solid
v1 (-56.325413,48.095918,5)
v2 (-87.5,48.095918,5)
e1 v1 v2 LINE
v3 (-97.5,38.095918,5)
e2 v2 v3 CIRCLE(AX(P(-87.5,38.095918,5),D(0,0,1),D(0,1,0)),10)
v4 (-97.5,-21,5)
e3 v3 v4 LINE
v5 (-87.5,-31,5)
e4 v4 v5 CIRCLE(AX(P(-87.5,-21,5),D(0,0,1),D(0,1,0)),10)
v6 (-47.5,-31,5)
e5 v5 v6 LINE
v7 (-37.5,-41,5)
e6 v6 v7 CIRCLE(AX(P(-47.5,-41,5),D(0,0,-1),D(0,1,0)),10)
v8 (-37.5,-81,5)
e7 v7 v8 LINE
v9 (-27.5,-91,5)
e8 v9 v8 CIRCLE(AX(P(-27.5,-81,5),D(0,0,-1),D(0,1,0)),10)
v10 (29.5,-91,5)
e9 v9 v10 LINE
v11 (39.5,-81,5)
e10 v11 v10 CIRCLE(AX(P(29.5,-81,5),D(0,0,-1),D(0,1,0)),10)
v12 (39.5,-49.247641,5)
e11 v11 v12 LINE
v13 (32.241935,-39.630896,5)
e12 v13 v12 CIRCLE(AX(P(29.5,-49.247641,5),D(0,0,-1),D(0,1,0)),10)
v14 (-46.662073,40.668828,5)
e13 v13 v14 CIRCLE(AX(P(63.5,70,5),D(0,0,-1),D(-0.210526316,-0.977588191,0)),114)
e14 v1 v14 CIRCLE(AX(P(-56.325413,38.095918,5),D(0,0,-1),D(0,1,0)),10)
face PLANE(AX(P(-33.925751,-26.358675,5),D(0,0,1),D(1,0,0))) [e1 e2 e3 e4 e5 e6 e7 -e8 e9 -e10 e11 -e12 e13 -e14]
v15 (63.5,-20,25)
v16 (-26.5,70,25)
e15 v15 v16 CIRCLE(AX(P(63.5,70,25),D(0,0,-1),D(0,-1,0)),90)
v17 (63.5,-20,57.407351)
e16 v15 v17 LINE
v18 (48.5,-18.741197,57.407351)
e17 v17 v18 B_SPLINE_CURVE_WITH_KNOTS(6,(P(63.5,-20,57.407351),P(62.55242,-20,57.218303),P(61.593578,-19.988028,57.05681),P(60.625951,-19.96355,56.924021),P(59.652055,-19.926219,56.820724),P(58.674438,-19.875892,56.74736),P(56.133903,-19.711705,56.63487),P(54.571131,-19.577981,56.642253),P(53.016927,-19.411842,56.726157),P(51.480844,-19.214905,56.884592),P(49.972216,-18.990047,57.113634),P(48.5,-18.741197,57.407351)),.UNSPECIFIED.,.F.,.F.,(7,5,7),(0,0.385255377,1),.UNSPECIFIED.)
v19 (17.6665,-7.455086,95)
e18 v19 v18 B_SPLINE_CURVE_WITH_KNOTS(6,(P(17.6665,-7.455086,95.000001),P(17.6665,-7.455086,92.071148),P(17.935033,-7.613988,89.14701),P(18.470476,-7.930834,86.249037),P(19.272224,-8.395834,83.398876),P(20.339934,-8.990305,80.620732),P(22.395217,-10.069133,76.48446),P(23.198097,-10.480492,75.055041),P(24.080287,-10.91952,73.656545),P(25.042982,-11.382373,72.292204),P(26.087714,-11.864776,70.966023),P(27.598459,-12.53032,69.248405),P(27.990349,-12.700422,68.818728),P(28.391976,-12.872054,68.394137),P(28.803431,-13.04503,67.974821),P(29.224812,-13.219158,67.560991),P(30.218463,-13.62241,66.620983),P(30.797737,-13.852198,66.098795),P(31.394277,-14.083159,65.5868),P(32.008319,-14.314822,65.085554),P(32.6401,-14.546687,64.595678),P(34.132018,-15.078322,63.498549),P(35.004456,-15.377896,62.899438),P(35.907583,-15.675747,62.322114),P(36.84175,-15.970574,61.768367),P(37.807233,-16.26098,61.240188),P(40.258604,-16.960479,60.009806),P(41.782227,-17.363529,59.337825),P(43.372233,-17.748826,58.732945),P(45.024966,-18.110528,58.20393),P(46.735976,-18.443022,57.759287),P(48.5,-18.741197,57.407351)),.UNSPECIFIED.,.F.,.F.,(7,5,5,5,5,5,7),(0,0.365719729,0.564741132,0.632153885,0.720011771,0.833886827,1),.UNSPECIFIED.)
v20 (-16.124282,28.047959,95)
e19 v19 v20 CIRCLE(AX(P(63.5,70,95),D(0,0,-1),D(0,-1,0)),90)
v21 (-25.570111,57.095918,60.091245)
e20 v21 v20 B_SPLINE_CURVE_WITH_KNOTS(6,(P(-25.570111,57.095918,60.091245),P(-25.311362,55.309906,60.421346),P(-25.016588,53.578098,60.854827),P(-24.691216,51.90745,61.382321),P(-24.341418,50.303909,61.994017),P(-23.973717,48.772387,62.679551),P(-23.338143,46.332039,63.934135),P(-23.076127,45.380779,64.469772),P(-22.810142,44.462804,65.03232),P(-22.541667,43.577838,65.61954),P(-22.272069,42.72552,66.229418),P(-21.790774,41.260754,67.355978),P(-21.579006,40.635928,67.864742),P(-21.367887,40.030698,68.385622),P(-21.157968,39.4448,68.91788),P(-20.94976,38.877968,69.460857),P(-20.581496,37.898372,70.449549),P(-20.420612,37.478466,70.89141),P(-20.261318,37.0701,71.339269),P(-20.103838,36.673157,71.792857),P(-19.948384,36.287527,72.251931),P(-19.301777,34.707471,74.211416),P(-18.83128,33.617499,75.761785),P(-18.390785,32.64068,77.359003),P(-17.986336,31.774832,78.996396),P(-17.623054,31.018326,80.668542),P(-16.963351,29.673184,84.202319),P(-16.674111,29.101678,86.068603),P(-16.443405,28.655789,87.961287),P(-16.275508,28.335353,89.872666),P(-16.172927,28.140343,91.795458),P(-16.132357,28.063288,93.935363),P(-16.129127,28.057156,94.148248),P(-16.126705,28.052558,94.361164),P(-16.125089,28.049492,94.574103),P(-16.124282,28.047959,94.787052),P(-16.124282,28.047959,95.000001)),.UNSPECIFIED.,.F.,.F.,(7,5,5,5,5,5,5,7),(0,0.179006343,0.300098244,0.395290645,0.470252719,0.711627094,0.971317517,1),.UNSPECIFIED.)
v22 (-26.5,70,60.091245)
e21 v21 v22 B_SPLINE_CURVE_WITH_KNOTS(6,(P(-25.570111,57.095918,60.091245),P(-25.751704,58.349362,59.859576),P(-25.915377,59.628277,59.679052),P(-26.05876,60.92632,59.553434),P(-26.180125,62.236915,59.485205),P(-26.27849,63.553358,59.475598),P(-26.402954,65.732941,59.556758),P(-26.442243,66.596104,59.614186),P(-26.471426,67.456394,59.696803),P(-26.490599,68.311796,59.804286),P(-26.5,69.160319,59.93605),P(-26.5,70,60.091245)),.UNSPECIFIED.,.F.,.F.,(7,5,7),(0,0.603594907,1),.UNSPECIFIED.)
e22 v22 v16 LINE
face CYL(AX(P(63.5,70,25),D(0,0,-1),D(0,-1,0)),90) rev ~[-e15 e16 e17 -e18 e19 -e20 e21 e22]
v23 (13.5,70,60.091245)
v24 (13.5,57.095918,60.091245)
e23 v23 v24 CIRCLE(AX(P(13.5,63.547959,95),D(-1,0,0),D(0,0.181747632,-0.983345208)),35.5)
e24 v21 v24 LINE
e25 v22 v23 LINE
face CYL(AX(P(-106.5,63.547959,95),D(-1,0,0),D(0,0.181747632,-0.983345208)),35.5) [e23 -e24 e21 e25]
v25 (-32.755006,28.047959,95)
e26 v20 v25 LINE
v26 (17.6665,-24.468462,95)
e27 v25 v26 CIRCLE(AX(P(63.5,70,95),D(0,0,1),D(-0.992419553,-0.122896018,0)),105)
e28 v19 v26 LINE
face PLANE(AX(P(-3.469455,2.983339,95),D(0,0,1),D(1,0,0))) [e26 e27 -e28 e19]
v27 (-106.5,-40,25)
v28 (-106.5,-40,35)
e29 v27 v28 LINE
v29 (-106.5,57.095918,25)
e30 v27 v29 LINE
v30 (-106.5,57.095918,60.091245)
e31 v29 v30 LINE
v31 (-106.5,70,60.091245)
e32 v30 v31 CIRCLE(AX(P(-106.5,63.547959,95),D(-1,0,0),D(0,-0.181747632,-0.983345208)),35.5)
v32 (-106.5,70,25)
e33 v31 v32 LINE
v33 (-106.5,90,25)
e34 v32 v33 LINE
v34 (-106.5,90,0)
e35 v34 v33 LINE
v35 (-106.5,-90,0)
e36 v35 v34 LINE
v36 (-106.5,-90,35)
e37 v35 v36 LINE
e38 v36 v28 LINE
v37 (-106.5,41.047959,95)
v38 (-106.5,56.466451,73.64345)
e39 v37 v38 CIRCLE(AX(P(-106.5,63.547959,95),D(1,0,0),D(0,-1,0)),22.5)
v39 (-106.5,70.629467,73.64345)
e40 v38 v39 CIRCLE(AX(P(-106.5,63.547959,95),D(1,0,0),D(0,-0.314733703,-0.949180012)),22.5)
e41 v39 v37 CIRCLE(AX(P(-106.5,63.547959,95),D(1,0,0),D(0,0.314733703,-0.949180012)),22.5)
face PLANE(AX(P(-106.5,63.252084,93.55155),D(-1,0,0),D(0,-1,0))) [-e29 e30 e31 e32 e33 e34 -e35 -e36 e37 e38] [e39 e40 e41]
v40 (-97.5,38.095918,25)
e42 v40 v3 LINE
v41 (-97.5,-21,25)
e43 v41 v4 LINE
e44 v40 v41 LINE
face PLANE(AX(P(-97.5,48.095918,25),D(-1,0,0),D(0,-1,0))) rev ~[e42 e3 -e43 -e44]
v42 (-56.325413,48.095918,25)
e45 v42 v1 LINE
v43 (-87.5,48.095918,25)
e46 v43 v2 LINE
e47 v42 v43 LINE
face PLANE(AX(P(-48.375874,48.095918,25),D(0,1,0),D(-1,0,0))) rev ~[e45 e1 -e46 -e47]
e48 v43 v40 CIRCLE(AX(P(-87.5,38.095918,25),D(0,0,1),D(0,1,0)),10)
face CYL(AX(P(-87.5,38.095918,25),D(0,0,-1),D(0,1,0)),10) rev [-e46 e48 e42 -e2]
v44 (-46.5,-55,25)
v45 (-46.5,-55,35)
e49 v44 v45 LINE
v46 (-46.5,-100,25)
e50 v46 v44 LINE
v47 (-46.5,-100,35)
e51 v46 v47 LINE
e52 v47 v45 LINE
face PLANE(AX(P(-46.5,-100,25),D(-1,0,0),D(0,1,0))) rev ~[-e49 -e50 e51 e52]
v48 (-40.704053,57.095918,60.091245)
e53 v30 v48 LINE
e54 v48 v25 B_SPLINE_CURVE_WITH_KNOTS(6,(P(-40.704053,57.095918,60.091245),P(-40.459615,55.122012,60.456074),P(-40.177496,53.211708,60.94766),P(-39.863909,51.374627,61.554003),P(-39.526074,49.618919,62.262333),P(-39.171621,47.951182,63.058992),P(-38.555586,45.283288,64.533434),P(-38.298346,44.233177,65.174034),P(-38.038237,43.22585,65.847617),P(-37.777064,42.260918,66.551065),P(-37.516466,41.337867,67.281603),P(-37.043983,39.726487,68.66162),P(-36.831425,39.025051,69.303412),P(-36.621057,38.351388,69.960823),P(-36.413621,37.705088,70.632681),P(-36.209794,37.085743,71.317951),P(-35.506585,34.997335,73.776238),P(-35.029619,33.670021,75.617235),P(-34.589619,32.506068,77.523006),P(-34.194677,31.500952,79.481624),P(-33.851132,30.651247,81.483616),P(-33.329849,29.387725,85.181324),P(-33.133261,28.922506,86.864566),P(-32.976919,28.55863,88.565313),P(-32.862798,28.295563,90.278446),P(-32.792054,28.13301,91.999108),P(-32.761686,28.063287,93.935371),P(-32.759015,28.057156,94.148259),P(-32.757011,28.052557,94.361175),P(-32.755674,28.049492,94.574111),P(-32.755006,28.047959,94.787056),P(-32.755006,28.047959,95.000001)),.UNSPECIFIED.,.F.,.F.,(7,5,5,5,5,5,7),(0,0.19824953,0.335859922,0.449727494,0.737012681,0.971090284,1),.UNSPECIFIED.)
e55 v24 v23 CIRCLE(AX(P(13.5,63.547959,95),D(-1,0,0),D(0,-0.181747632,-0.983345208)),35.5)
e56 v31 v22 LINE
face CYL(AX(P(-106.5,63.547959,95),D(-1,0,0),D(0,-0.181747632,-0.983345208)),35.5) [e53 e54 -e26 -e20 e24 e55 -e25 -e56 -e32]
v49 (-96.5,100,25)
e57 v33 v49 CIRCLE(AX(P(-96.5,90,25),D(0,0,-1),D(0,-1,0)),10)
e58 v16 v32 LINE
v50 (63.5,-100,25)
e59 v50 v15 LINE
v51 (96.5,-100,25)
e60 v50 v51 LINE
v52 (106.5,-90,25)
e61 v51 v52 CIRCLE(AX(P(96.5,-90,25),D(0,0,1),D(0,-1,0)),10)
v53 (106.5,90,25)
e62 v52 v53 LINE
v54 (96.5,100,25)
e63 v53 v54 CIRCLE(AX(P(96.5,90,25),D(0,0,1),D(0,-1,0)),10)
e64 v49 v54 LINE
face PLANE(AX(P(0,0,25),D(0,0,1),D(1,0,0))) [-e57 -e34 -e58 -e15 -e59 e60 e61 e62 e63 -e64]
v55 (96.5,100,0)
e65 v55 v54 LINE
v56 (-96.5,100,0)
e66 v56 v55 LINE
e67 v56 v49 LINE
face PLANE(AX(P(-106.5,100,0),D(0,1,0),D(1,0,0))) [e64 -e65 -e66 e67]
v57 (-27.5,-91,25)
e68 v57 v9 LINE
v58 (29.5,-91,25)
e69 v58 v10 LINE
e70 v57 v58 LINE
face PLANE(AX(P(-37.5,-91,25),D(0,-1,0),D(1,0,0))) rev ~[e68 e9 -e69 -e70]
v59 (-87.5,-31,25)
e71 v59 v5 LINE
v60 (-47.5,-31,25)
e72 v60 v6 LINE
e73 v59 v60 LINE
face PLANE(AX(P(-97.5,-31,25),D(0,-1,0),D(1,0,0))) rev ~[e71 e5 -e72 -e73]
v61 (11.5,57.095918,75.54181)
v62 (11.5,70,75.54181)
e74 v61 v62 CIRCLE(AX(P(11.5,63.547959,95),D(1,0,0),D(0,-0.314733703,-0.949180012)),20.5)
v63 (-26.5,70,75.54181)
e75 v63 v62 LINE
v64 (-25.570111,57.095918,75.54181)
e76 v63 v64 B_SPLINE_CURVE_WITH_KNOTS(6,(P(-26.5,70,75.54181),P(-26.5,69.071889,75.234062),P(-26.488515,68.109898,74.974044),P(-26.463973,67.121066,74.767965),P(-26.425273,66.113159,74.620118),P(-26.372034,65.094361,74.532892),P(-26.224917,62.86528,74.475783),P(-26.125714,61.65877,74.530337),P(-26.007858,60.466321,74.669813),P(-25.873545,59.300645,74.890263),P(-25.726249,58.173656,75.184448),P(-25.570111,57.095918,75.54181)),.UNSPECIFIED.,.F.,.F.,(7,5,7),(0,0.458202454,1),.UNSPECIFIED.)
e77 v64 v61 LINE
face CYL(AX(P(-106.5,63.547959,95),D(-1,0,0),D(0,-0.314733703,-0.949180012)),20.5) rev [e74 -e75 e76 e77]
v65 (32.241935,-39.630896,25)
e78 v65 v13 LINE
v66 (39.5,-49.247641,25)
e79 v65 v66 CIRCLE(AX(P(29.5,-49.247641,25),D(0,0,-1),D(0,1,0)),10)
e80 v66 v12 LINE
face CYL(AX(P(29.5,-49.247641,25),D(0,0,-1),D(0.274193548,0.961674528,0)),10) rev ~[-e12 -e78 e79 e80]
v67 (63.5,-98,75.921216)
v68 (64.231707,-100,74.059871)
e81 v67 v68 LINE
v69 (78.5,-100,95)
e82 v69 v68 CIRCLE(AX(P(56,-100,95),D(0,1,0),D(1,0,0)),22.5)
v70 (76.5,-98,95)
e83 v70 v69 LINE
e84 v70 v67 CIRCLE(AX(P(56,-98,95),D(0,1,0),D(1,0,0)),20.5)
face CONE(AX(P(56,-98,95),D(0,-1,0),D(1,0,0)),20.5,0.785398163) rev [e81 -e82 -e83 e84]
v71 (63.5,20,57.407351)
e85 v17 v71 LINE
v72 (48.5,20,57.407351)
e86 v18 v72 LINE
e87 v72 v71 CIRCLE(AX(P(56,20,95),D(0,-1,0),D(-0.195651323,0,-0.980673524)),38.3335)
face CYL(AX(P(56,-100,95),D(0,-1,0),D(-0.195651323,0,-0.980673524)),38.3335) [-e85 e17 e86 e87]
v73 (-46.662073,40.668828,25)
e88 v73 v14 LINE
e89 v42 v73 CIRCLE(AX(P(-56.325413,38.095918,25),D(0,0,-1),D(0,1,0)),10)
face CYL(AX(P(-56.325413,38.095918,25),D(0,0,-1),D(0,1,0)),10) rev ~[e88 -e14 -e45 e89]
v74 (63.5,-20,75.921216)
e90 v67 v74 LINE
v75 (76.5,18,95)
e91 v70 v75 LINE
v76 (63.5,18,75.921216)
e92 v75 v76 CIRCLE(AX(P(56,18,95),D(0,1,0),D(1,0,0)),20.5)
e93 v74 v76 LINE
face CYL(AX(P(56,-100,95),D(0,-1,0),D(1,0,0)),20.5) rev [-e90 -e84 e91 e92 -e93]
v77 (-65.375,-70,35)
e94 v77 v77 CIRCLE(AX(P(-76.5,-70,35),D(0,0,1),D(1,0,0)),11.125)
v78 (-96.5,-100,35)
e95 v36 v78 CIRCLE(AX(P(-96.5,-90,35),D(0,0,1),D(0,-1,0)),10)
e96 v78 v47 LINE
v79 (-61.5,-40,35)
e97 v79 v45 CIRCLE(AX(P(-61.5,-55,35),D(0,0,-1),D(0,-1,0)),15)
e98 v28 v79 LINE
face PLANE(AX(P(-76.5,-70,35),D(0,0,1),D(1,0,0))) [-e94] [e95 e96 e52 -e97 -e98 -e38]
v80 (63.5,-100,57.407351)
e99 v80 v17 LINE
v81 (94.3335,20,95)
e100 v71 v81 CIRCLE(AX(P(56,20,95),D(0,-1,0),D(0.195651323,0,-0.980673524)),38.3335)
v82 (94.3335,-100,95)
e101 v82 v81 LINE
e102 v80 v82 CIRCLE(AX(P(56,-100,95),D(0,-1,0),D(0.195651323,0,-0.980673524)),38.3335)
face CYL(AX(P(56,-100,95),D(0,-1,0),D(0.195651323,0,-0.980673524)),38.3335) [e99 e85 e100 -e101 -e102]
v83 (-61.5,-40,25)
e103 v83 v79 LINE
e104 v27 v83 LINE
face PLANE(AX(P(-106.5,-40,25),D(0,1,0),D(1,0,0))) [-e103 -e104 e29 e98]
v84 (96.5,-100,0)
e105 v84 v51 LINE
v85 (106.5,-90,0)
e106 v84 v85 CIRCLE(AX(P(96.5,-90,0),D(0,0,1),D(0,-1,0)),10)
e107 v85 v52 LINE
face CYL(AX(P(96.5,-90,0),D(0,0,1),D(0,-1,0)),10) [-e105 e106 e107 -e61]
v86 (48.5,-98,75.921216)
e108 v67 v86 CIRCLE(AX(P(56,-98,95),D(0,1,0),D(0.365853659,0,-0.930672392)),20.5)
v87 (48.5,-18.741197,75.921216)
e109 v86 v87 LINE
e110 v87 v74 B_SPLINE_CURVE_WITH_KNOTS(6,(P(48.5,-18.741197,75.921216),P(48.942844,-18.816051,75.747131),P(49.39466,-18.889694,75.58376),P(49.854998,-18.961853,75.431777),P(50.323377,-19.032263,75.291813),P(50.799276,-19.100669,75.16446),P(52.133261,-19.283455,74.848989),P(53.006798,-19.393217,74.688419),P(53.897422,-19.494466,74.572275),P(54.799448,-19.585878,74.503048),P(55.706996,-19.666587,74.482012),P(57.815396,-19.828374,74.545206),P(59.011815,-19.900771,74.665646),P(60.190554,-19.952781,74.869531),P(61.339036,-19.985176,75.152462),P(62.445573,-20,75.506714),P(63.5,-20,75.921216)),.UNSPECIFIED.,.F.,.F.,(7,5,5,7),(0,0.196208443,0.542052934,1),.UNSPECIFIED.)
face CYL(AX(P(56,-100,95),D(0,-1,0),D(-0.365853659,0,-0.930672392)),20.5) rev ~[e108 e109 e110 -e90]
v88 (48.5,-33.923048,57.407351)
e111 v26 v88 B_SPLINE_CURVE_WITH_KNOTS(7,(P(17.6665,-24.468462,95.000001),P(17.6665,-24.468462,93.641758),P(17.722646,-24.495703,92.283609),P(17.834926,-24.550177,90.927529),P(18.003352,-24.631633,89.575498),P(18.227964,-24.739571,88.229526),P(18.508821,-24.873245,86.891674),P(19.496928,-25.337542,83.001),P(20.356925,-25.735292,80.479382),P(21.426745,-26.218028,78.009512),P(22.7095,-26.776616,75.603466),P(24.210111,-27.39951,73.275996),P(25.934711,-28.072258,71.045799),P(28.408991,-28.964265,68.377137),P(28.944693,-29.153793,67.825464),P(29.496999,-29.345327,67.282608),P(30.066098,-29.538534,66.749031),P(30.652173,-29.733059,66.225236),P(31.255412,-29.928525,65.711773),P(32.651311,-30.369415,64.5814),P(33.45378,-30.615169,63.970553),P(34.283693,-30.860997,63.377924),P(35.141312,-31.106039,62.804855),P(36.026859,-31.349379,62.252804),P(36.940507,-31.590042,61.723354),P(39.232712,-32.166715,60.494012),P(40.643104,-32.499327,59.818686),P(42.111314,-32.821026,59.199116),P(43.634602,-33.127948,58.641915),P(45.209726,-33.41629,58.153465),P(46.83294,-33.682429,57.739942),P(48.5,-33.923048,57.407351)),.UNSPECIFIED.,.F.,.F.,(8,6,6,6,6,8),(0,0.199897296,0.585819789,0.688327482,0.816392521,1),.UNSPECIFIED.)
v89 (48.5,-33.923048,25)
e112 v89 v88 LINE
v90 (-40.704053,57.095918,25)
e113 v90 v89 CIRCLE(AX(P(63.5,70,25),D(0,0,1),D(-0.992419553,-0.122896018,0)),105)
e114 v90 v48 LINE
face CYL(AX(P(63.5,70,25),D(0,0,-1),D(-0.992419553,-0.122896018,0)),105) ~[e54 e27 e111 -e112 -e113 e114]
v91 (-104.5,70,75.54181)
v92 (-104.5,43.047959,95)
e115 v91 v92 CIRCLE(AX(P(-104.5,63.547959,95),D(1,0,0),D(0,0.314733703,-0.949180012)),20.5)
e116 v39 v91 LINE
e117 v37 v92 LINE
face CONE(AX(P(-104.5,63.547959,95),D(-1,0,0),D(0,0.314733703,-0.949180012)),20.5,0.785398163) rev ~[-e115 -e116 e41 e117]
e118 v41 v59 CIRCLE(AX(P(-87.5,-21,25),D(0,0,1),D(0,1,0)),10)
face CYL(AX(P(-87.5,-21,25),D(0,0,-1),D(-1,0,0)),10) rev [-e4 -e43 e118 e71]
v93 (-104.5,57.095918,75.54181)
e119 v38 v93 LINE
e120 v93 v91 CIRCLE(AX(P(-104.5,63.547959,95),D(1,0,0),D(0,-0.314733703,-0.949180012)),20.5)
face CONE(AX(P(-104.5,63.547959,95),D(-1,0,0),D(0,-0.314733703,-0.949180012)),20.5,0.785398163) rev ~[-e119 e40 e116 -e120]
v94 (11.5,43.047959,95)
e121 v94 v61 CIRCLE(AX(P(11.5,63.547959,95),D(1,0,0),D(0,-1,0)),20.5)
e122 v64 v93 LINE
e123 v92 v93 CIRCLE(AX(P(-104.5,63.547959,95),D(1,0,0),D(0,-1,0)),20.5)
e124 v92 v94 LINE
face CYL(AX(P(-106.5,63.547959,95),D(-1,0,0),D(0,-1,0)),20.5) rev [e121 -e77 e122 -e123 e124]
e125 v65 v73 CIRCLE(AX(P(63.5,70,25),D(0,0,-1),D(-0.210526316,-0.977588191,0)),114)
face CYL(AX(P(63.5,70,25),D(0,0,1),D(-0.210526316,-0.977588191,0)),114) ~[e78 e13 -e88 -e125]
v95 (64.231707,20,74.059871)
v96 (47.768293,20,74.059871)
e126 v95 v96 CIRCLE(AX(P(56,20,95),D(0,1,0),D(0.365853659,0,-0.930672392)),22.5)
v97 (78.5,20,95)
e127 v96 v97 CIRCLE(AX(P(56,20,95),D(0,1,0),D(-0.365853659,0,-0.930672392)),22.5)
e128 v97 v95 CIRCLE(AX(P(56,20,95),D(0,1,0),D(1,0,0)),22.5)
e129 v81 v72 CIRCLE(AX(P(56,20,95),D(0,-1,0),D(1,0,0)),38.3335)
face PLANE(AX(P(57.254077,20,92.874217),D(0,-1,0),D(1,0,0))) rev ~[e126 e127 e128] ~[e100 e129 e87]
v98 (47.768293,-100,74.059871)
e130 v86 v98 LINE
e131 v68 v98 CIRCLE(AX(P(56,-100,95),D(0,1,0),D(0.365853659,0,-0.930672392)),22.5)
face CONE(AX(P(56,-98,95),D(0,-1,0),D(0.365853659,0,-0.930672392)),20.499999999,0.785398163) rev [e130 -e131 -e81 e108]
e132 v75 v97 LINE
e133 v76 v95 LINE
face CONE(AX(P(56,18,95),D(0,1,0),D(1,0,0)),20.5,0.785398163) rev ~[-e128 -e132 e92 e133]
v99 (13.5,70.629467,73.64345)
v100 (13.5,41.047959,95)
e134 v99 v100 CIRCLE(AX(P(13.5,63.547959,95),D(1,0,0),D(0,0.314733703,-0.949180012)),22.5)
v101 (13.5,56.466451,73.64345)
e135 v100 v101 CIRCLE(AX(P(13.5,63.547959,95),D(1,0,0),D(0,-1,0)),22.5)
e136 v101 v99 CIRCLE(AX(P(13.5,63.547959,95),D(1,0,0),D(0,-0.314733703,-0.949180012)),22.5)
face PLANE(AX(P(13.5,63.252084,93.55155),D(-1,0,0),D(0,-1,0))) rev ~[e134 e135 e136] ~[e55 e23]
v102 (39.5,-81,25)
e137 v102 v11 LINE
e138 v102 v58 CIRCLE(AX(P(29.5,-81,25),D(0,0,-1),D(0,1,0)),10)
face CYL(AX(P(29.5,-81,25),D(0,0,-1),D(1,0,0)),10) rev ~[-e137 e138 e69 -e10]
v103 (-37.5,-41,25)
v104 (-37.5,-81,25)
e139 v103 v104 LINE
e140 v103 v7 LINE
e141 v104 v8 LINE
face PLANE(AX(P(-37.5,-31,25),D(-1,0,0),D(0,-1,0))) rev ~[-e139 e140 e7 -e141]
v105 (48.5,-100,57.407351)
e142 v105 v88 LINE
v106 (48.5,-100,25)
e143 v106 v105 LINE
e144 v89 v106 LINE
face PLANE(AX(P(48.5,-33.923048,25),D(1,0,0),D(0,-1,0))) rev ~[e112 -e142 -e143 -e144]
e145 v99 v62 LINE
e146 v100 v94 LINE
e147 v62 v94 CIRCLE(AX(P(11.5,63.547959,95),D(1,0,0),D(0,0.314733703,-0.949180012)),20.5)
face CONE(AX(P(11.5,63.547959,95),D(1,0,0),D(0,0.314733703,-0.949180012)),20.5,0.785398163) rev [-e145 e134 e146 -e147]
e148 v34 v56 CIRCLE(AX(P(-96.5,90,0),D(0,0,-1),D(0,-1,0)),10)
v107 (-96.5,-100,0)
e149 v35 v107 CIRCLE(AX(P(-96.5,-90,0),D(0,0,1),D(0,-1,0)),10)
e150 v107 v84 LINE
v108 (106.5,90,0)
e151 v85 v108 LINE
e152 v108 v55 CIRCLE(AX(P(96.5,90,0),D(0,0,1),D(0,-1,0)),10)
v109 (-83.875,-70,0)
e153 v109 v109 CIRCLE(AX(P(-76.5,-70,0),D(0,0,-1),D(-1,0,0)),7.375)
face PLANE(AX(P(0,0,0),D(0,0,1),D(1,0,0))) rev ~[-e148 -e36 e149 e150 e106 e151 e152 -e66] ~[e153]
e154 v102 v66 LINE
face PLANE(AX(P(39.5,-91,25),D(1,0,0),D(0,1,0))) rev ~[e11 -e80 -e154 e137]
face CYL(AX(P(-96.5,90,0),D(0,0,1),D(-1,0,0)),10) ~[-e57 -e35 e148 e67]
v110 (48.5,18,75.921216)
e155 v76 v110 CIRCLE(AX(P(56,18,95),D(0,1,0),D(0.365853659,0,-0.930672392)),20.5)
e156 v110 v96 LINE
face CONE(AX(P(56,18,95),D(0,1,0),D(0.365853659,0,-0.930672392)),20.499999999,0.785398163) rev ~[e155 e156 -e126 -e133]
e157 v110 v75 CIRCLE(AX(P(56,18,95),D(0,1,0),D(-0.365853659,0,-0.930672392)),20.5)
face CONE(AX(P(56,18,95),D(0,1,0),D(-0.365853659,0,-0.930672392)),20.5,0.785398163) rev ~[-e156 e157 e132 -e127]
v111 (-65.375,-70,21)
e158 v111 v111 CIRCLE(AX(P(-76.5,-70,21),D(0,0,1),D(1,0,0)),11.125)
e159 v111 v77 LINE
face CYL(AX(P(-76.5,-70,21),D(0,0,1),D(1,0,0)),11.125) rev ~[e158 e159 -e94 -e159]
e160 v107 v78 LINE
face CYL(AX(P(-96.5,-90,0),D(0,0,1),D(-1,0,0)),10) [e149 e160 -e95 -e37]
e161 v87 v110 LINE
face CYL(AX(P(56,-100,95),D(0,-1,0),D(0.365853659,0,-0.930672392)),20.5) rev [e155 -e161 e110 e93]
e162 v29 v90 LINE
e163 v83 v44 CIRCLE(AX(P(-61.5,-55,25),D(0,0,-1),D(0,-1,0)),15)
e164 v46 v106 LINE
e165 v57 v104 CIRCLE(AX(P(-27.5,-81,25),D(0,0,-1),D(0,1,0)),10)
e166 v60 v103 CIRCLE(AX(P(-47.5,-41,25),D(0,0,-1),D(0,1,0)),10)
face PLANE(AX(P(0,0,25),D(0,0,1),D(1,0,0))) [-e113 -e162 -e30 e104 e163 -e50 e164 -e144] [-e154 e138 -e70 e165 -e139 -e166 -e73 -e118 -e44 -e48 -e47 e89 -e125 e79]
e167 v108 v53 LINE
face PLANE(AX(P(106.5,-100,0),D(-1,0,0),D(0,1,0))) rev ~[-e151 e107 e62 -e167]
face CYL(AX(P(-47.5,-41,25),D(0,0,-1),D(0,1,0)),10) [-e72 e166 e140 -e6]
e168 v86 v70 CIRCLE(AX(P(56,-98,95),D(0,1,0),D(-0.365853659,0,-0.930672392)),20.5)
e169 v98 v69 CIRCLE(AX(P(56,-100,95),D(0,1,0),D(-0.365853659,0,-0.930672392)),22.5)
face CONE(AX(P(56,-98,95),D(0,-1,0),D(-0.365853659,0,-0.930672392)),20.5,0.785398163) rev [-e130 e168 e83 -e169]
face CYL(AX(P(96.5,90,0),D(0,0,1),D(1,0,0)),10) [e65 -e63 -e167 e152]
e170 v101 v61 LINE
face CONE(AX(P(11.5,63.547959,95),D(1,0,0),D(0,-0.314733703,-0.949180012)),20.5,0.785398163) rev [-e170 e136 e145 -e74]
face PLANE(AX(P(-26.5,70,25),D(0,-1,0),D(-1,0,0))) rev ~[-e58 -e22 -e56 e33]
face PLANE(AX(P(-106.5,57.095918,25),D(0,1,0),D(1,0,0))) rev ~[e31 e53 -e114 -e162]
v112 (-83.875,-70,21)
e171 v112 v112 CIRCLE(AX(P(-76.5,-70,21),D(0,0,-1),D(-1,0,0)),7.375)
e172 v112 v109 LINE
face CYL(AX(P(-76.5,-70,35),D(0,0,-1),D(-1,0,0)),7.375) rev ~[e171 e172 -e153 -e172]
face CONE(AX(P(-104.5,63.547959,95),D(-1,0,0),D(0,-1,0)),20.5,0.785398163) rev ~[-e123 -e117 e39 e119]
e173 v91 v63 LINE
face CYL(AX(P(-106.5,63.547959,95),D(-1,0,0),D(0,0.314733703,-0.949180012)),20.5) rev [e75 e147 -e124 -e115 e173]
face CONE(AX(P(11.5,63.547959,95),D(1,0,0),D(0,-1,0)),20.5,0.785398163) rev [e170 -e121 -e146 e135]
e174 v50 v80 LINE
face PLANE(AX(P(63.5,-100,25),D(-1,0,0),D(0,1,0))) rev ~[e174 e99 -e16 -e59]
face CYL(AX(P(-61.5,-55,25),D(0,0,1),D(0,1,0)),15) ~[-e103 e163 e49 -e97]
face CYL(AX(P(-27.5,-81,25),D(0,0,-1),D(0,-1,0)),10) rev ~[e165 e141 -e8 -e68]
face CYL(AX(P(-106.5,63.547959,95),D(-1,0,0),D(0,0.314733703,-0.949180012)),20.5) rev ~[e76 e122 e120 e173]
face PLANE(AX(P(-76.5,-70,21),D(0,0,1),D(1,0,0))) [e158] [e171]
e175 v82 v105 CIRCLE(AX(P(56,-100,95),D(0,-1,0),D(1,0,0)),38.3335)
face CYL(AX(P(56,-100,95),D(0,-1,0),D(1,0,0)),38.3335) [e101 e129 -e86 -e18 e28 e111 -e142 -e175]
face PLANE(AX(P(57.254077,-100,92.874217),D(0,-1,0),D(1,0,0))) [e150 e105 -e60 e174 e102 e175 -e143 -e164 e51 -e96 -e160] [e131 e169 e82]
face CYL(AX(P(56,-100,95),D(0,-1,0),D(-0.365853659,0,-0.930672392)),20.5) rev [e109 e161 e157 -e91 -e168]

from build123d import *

# Parameters (mm, degrees)
F0_W            = 213
F0_H            = 200
F1_DEPTH        = 25
F2_W            = 60
F2_H            = 60
F3_DEPTH        = 10
F4_R            = 10
F5_R            = 15
F6_DEPTH        = 20
F7_DEPTH        = 70
F8_R            = 10
F10_DEPTH       = 120
F11_DEPTH       = 120
F12_SIZE        = 2
F14_DEPTH       = 120
F15_DEPTH       = 120
F16_SIZE        = 2
F18_D           = 14.75
F18_CBORE_D     = 22.25
F18_CBORE_DEPTH = 14
F19_SIZE        = 2
F20_SIZE        = 2


with BuildPart() as f1:
    # F0 (on Top) → F1 (new body)
    with BuildSketch(Plane.XY):
        Rectangle(F0_W, F0_H)
    extrude(amount=F1_DEPTH)

    # F2 (on face) → F3 (join)
    with BuildSketch(Plane.XY.offset(25)):
        with Locations((-76.5, -70)):
            Rectangle(F2_W, F2_H)
    extrude(amount=F3_DEPTH)

    # F4
    f4_edges = [f1.edges().sort_by_distance(p)[0] for p in [
        (-106.5, -100, 17.5),
        (106.5, -100, 12.5),
        (106.5, 100, 12.5),
        (-106.5, 100, 12.5),
    ]]
    fillet(f4_edges, radius=F4_R)

    # F5
    f5_edges = [f1.edges().sort_by_distance(p)[0] for p in [
        (-46.5, -40, 30),
    ]]
    fillet(f5_edges, radius=F5_R)

    # F2 (on face) → F6 (cut)
    with BuildSketch(Plane.XY.offset(25)):
        with BuildLine():
            Line((-48.3758740693, 48.0959181604), (-97.5, 48.0959181604))
            Line((-97.5, 48.0959181604), (-97.5, -31))
            Line((-97.5, -31), (-37.5, -31))
            Line((-37.5, -31), (-37.5, -91))
            Line((-37.5, -91), (39.5, -91))
            Line((39.5, -91), (39.5, -41.445053726))
            ThreePointArc((39.5, -41.445053726), (-17.8631347732, -9.8501114582), (-48.3758740693, 48.0959181604))
        make_face()
    extrude(amount=-F6_DEPTH, mode=Mode.SUBTRACT)

    # F2 (on face) → F7 (join)
    with BuildSketch(Plane.XY.offset(25)):
        with BuildLine():
            Line((48.5, -33.9230484541), (48.5, -100))
            Line((48.5, -100), (63.5, -100))
            Line((63.5, -100), (63.5, -20))
            ThreePointArc((63.5, -20), (-0.1396103068, 6.3603896932), (-26.5, 70))
            Line((-26.5, 70), (-106.5, 70))
            Line((-106.5, 70), (-106.5, 57.0959181604))
            Line((-106.5, 57.0959181604), (-40.7040530492, 57.0959181604))
            ThreePointArc((-40.7040530492, 57.0959181604), (-11.4900969244, -3.4947982055), (48.5, -33.9230484541))
        make_face()
    extrude(amount=F7_DEPTH)

    # F8
    f8_edges = [f1.edges().sort_by_distance(p)[0] for p in [
        (-48.375874, 48.095918, 15),
        (39.5, -41.445054, 15),
        (-37.5, -31, 15),
        (-97.5, 48.095918, 15),
        (39.5, -91, 15),
        (-37.5, -91, 15),
        (-97.5, -31, 15),
    ]]
    fillet(f8_edges, radius=F8_R)

    # F9 (on face) → F10 (cut)
    with BuildSketch(Plane(origin=(-106.5, 0, 0), x_dir=(0, -1, 0), z_dir=(-1, 0, 0))):
        with BuildLine():
            ThreePointArc((-43.0479590802, 95), (-75.5476082656, 111.621023417), (-70, 75.5418097458))
            Line((-70, 75.5418097458), (-70, 95))
            Line((-70, 95), (-57.0959181604, 95))
            Line((-57.0959181604, 95), (-57.0959181604, 75.5418097458))
            ThreePointArc((-57.0959181604, 75.5418097458), (-46.9269356632, 83.0003508146), (-43.0479590802, 95))
        make_face()
        with BuildLine():
            Line((-70, 95), (-70, 75.5418097458))
            ThreePointArc((-70, 75.5418097458), (-63.5479590802, 74.5), (-57.0959181604, 75.5418097458))
            Line((-57.0959181604, 75.5418097458), (-57.0959181604, 95))
            Line((-57.0959181604, 95), (-70, 95))
        make_face()
        with BuildLine():
            ThreePointArc((-57.0959181604, 60.09124511), (-36.2597065468, 72.2931447868), (-28.0479590802, 95))
            ThreePointArc((-28.0479590802, 95), (-86.2548142934, 122.2882525334), (-70, 60.09124511))
            Line((-70, 60.09124511), (-70, 75.5418097458))
            ThreePointArc((-70, 75.5418097458), (-75.5476082656, 111.621023417), (-43.0479590802, 95))
            ThreePointArc((-43.0479590802, 95), (-46.9269356632, 83.0003508146), (-57.0959181604, 75.5418097458))
            Line((-57.0959181604, 75.5418097458), (-57.0959181604, 60.09124511))
        make_face()
    extrude(amount=-F10_DEPTH, mode=Mode.SUBTRACT)

    # F9 (on face) → F11 (join)
    with BuildSketch(Plane(origin=(-106.5, 0, 0), x_dir=(0, -1, 0), z_dir=(-1, 0, 0))):
        with BuildLine():
            ThreePointArc((-57.0959181604, 60.09124511), (-36.2597065468, 72.2931447868), (-28.0479590802, 95))
            ThreePointArc((-28.0479590802, 95), (-86.2548142934, 122.2882525334), (-70, 60.09124511))
            Line((-70, 60.09124511), (-70, 75.5418097458))
            ThreePointArc((-70, 75.5418097458), (-75.5476082656, 111.621023417), (-43.0479590802, 95))
            ThreePointArc((-43.0479590802, 95), (-46.9269356632, 83.0003508146), (-57.0959181604, 75.5418097458))
            Line((-57.0959181604, 75.5418097458), (-57.0959181604, 60.09124511))
        make_face()
        with BuildLine():
            Line((-70, 75.5418097458), (-70, 60.09124511))
            ThreePointArc((-70, 60.09124511), (-63.5479590802, 59.5), (-57.0959181604, 60.09124511))
            Line((-57.0959181604, 60.09124511), (-57.0959181604, 75.5418097458))
            ThreePointArc((-57.0959181604, 75.5418097458), (-63.5479590802, 74.5), (-70, 75.5418097458))
        make_face()
    extrude(amount=-F11_DEPTH)

    # F12
    f12_edges = [f1.edges().sort_by_distance(p)[0] for p in [
        (-106.5, 84.047959, 95),
    ]]
    chamfer(f12_edges, length=F12_SIZE)

    # F13 (on face) → F14 (cut)
    with BuildSketch(Plane.XZ.offset(100)):
        with BuildLine():
            ThreePointArc((76.5, 95), (44.4566036194, 111.9410743461), (48.5, 75.9212159717))
            Line((48.5, 75.9212159717), (48.5, 95))
            Line((48.5, 95), (63.5, 95))
            Line((63.5, 95), (63.5, 75.9212159717))
            ThreePointArc((63.5, 75.9212159717), (72.9410743461, 83.4566036194), (76.5, 95))
        make_face()
        with BuildLine():
            Line((48.5, 95), (48.5, 75.9212159717))
            ThreePointArc((48.5, 75.9212159717), (56, 74.5), (63.5, 75.9212159717))
            Line((63.5, 75.9212159717), (63.5, 95))
            Line((63.5, 95), (48.5, 95))
        make_face()
    extrude(amount=-F14_DEPTH, mode=Mode.SUBTRACT)

    # F13 (on face) → F15 (join)
    with BuildSketch(Plane.XZ.offset(100)):
        with BuildLine():
            ThreePointArc((63.5, 57.4073514866), (85.6391503948, 70.6899612068), (94.3335, 95))
            ThreePointArc((94.3335, 95), (31.6899612068, 124.6391503948), (48.5, 57.4073514866))
            Line((48.5, 57.4073514866), (48.5, 75.9212159717))
            ThreePointArc((48.5, 75.9212159717), (44.4566036194, 111.9410743461), (76.5, 95))
            ThreePointArc((76.5, 95), (72.9410743461, 83.4566036194), (63.5, 75.9212159717))
            Line((63.5, 75.9212159717), (63.5, 57.4073514866))
        make_face()
        with BuildLine():
            Line((48.5, 75.9212159717), (48.5, 57.4073514866))
            ThreePointArc((48.5, 57.4073514866), (56, 56.6665), (63.5, 57.4073514866))
            Line((63.5, 57.4073514866), (63.5, 75.9212159717))
            ThreePointArc((63.5, 75.9212159717), (56, 74.5), (48.5, 75.9212159717))
        make_face()
    extrude(amount=-F15_DEPTH)

    # F16
    f16_edges = [f1.edges().sort_by_distance(p)[0] for p in [
        (35.5, -100, 95),
    ]]
    chamfer(f16_edges, length=F16_SIZE)

    # F18 (through all)
    with Locations(Plane.XY.offset(35)):
        with Locations((-76.5, -70)):
            CounterBoreHole(F18_D / 2, F18_CBORE_D / 2, F18_CBORE_DEPTH)

    # F19
    f19_edges = [f1.edges().sort_by_distance(p)[0] for p in [
        (35.5, 20, 95),
    ]]
    chamfer(f19_edges, length=F19_SIZE)

    # F20
    f20_edges = [f1.edges().sort_by_distance(p)[0] for p in [
        (13.5, 84.047959, 95),
    ]]
    chamfer(f20_edges, length=F20_SIZE)


solid = f1.part
